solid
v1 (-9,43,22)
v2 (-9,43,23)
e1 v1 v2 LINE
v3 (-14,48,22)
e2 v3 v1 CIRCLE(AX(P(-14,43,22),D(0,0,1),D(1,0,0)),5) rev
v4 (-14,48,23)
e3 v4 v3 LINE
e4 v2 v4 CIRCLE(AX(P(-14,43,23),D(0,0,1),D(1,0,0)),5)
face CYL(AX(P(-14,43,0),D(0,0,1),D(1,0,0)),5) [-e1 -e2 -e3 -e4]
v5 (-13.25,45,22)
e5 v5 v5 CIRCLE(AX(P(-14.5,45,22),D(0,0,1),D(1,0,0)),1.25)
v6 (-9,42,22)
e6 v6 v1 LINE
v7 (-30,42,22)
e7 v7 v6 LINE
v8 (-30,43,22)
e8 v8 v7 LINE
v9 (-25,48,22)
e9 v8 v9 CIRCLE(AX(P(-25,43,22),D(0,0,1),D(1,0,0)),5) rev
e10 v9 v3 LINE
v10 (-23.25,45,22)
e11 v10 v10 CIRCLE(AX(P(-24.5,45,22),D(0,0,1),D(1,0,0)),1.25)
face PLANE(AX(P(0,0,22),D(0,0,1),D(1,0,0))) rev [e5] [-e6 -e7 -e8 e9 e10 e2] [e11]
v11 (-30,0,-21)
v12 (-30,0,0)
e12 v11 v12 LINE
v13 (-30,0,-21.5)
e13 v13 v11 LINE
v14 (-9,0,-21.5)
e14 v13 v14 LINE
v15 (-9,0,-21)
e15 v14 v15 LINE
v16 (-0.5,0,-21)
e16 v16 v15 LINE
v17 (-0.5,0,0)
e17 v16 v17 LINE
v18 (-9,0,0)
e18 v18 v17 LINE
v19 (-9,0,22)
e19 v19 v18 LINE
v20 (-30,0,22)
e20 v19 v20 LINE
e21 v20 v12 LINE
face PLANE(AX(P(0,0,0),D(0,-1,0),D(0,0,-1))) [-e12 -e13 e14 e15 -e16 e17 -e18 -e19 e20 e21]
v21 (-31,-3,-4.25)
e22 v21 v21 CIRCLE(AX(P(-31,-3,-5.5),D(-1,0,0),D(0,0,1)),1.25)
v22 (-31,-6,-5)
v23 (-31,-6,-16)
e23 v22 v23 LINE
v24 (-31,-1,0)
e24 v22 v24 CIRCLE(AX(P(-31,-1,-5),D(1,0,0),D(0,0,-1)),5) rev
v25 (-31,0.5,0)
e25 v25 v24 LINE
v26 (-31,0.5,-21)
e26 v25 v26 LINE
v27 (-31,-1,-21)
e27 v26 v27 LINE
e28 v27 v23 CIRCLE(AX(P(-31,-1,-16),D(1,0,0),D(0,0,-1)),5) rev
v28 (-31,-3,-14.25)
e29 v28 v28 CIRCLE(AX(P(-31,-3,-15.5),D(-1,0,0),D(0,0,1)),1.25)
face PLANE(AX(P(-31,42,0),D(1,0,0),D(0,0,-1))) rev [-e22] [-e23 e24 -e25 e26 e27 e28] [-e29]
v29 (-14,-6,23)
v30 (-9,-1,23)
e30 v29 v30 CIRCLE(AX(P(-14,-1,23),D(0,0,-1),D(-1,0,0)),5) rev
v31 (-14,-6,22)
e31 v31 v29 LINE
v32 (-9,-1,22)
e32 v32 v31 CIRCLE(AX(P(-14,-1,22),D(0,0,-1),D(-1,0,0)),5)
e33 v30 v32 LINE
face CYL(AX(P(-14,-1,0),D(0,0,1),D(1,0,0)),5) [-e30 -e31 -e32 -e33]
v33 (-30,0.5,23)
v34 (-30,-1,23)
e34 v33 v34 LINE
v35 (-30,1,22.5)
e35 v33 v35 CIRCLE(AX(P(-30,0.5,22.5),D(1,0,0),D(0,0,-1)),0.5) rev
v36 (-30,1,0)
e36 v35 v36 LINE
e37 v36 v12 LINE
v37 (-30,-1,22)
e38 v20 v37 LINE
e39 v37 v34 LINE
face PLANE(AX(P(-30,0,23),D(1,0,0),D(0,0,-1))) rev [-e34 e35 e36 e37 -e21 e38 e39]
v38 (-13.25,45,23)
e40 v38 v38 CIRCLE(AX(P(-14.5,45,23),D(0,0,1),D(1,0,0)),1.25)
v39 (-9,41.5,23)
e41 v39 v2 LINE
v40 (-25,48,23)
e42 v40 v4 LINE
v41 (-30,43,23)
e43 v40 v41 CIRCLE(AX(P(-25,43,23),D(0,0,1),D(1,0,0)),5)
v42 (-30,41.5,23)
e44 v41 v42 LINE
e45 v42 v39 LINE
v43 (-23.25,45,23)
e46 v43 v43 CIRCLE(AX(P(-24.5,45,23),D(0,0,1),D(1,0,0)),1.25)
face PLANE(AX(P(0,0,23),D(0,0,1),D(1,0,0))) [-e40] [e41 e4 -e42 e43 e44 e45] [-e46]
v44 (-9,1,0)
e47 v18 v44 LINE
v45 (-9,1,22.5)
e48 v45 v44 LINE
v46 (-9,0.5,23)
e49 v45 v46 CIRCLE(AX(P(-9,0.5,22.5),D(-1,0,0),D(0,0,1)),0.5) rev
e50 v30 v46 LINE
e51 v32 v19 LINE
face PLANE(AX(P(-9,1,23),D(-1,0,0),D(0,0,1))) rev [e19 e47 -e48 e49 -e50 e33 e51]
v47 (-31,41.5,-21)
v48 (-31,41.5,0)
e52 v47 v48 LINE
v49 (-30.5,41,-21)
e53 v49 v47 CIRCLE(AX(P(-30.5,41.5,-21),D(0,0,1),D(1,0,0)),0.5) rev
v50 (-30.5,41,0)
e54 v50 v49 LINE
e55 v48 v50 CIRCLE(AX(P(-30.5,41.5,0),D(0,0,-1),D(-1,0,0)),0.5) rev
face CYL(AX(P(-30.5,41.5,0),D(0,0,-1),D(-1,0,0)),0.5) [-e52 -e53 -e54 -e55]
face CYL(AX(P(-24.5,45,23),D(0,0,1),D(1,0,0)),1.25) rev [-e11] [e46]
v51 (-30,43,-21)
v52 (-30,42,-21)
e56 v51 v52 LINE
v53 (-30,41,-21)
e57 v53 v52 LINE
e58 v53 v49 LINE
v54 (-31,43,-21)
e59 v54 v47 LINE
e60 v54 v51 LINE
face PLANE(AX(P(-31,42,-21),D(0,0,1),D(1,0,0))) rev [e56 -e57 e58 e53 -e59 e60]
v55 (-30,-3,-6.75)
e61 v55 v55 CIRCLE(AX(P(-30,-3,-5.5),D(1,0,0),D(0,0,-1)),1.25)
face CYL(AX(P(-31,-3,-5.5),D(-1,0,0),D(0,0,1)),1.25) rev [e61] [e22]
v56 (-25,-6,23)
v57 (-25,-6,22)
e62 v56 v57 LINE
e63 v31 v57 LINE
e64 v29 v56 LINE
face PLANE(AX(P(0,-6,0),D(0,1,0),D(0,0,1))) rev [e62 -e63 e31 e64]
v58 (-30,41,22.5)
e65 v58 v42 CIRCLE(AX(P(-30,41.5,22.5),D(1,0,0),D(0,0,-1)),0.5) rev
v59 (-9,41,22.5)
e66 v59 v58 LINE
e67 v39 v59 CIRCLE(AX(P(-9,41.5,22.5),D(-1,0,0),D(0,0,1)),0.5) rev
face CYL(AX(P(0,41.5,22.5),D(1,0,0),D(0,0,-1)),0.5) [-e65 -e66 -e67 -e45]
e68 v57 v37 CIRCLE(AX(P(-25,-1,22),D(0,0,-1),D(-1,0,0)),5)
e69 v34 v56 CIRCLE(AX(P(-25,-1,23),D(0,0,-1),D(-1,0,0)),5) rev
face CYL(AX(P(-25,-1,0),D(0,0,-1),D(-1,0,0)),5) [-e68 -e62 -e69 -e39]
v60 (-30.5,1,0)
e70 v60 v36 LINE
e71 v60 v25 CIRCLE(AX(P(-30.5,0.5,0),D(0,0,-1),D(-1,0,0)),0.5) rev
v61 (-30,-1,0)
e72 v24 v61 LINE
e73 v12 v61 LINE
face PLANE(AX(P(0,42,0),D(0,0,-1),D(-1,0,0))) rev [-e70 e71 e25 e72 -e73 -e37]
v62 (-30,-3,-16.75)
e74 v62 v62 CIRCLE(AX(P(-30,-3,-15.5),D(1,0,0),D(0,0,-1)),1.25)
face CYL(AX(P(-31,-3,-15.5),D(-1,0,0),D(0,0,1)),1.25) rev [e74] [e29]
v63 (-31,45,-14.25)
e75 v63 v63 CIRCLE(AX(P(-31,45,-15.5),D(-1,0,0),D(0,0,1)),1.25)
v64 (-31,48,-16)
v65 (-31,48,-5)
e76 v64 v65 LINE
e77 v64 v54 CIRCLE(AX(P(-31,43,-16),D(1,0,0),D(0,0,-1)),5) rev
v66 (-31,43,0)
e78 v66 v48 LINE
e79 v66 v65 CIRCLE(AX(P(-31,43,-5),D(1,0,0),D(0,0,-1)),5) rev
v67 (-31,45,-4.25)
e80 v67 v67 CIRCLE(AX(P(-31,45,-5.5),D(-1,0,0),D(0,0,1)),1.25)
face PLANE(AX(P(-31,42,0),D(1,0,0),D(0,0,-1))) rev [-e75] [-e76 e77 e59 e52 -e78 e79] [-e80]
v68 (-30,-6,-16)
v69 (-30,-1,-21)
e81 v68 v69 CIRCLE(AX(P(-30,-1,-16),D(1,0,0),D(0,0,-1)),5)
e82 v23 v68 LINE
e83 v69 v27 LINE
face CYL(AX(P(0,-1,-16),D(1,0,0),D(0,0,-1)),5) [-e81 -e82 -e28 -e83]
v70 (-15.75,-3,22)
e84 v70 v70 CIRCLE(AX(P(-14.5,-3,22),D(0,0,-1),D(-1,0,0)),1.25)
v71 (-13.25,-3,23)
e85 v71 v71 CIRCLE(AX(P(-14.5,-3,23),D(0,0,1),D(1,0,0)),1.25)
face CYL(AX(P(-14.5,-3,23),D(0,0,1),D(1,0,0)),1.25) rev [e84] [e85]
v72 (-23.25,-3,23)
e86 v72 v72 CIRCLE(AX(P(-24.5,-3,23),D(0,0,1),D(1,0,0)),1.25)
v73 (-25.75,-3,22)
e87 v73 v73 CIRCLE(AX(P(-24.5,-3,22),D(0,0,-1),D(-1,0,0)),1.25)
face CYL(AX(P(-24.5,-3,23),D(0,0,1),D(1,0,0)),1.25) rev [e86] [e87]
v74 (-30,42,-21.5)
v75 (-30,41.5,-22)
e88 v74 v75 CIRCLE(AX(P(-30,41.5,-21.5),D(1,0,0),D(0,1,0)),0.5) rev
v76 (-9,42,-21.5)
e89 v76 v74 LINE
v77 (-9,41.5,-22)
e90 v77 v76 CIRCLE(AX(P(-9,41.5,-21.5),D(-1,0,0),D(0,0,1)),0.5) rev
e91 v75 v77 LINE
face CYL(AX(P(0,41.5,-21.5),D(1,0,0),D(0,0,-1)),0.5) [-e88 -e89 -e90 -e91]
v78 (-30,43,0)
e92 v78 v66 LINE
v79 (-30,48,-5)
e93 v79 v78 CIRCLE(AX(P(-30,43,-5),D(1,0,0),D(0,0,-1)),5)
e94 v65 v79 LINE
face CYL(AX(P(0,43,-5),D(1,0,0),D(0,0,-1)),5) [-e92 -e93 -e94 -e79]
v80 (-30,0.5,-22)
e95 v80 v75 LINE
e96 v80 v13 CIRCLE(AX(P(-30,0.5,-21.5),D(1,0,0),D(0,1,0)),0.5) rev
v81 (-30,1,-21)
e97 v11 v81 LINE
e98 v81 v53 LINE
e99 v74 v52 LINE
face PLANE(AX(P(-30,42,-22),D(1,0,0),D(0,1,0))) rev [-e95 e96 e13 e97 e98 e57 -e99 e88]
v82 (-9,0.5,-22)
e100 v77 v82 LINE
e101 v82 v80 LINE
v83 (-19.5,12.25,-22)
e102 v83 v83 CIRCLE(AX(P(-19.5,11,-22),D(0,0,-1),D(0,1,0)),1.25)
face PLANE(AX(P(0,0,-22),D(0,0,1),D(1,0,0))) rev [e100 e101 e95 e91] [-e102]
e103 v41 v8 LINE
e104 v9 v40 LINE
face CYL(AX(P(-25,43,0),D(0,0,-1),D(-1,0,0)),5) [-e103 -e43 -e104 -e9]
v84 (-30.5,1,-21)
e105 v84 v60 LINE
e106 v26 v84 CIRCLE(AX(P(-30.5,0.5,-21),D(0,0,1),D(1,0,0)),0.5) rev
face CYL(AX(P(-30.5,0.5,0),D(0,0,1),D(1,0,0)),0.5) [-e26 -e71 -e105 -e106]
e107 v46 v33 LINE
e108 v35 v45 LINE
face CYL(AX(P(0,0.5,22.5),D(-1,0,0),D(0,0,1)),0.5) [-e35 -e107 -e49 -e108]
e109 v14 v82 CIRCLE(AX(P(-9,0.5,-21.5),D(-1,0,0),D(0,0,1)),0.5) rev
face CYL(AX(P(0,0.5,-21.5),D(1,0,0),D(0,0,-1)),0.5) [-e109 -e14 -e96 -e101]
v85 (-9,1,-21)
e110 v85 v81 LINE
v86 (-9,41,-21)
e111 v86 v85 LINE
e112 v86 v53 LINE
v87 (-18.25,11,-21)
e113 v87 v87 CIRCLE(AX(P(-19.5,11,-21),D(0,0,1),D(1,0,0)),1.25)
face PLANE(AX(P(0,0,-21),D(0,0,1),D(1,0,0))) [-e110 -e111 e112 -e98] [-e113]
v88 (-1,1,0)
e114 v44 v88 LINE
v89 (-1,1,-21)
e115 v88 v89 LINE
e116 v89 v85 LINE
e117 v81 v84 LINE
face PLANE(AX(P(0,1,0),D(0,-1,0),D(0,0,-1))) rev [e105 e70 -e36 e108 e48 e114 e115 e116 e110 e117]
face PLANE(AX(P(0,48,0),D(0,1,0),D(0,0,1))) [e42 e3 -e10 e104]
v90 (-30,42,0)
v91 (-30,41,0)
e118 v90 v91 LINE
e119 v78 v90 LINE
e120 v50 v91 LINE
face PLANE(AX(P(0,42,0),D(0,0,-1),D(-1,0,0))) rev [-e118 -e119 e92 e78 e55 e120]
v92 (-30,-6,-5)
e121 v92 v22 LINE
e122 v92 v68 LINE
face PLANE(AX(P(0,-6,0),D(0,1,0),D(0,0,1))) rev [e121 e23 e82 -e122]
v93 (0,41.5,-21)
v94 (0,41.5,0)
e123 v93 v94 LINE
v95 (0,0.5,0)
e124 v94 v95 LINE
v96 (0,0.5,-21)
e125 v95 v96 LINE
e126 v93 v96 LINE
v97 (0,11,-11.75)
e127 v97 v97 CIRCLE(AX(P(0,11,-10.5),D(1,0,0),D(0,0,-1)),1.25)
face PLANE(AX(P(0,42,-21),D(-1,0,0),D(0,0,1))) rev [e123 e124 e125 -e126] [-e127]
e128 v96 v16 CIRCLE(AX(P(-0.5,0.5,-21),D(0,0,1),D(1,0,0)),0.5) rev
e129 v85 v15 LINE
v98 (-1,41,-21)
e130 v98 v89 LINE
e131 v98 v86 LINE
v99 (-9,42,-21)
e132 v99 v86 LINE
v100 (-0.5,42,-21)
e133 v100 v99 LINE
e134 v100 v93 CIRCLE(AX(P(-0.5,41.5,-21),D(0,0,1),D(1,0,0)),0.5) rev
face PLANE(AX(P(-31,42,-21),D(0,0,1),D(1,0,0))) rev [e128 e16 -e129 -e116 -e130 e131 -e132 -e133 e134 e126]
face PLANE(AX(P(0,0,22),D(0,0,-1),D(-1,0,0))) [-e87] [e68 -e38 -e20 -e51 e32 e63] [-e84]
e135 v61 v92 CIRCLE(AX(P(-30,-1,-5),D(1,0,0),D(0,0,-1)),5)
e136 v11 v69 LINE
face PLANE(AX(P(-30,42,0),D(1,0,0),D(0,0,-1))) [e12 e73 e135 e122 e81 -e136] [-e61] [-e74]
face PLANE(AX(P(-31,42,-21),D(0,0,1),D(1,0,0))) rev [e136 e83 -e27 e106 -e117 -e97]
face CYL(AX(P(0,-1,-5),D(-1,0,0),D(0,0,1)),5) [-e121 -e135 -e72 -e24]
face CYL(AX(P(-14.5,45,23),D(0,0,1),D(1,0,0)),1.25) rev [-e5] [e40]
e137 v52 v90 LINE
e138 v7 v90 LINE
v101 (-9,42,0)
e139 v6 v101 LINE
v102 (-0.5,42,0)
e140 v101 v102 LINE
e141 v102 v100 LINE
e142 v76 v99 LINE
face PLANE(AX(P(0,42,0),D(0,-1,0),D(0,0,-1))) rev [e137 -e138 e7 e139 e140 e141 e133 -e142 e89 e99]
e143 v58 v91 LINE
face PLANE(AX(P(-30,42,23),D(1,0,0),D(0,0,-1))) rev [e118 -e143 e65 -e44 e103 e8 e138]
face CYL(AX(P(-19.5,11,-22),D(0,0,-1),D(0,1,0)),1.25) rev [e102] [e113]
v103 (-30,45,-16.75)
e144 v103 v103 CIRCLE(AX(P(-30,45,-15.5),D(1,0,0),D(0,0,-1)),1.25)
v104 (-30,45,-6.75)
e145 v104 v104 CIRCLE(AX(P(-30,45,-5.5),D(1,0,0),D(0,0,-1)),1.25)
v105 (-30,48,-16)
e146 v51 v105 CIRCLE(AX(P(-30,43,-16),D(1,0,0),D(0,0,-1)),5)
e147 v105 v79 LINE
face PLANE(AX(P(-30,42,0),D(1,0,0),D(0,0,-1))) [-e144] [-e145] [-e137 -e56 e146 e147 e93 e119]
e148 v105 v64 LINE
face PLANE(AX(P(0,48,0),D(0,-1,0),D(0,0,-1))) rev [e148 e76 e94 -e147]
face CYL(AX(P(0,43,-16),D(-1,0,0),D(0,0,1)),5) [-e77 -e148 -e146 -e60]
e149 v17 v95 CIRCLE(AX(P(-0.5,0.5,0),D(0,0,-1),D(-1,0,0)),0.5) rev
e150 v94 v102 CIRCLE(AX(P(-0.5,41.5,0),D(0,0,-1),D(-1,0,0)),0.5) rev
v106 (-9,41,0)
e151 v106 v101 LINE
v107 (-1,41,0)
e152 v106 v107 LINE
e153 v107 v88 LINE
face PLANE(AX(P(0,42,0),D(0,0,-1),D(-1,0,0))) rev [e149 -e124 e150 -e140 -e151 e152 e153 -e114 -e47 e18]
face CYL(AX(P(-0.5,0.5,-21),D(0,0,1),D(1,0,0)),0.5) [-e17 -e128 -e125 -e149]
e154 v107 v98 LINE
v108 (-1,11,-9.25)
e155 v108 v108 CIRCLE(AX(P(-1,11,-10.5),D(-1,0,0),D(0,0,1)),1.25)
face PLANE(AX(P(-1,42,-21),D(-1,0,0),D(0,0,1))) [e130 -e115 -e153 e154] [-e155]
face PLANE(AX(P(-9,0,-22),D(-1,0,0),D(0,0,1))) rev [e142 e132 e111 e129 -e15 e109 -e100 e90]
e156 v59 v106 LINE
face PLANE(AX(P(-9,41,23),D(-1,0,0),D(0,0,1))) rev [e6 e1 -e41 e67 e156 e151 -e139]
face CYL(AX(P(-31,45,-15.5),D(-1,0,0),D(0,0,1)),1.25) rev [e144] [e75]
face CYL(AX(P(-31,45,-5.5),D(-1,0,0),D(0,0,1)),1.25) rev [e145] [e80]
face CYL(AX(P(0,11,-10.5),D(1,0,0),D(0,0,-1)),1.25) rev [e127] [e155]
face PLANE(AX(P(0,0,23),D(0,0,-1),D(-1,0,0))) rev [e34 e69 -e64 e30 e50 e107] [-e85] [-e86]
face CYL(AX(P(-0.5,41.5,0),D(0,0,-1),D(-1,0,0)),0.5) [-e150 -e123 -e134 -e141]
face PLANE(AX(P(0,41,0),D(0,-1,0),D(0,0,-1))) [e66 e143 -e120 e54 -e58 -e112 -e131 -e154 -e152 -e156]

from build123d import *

# Parameters (mm, degrees)
SKETCH_1_W         = 31
SKETCH_1_H         = 21
EXTRUDE_1_DEPTH    = 42
SHELL_1_T          = -1
SKETCH_2_W         = 5
SKETCH_2_H         = 21
EXTRUDE_2_DEPTH    = 6
SHELL_START        = 42
SHELL_2_OUTLINE_W  = 4
SHELL_2_OUTLINE_H  = 21
SHELL_2_DEPTH      = 6
SKETCH_3_W         = 5
SKETCH_3_H         = 21
EXTRUDE_3_DEPTH    = 6
SHELL_START_2      = -6
SHELL_3_OUTLINE_W  = 4
SHELL_3_OUTLINE_H  = 21
SHELL_3_DEPTH      = 6
SKETCH_4_W         = 21
SKETCH_4_H         = 1
EXTRUDE_4_DEPTH    = 23
SKETCH_5_W         = 21
SKETCH_5_H         = 5
EXTRUDE_5_DEPTH    = 6
SHELL_START_3      = 18
SHELL_4_OUTLINE_W  = 21
SHELL_4_OUTLINE_H  = 6
SHELL_4_DEPTH      = 4
SKETCH_6_W         = 21
SKETCH_6_H         = 5
EXTRUDE_6_DEPTH    = 6
SHELL_5_OUTLINE_W  = 21
SHELL_5_OUTLINE_H  = 6
SHELL_5_DEPTH      = 4
SKETCH_8_W         = 21
SKETCH_8_H         = 42
EXTRUDE_7_DEPTH    = 1
HOLE_WIZARD_M3_1_D = 2.5
HOLE_WIZARD_M3_2_D = 2.5
HOLE_WIZARD_M3_3_D = 2.5
HOLE_WIZARD_M3_4_D = 2.5
FILLET_2_R         = 0.5
FILLET_3_R         = 5


# Read off the part's stored shape, not the designer's step: 抽壳2, 抽壳3, 抽壳4, 抽壳5
with BuildPart() as part:
    # 草图1 → 凸台-拉伸1 (new body)
    with BuildSketch(Plane(origin=(0, 0, 0), x_dir=(1, 0, 0), z_dir=(0, 1, 0))):
        with Locations((-15.5, 10.5)):
            Rectangle(SKETCH_1_W, SKETCH_1_H)
    extrude(amount=EXTRUDE_1_DEPTH)

    # 抽壳1
    shell_1_openings = [part.faces().sort_by_distance(p)[0] for p in [
        (-15.5, 21, 0),
        (-31, 21, -10.5),
        (-15.5, 21, -21),
    ]]
    offset(amount=SHELL_1_T, openings=shell_1_openings, kind=Kind.INTERSECTION)

    # 草图2 → 凸台-拉伸2 (add)
    with BuildSketch(Plane(origin=(0, 42, 0), x_dir=(1, 0, 0), z_dir=(0, 1, 0))):
        with Locations((-28.5, 10.5)):
            Rectangle(SKETCH_2_W, SKETCH_2_H)
    extrude(amount=EXTRUDE_2_DEPTH)

    # 抽壳2 outline → 抽壳2 (cut)
    with BuildSketch(Plane(origin=(0, 0, 0), x_dir=(1, 0, 0), z_dir=(0, 1, 0)).offset(SHELL_START)):
        with Locations((-28, 10.5)):
            Rectangle(SHELL_2_OUTLINE_W, SHELL_2_OUTLINE_H)
    extrude(amount=SHELL_2_DEPTH, mode=Mode.SUBTRACT)

    # 草图3 → 凸台-拉伸3 (add)
    with BuildSketch(Plane.XZ):
        with Locations((-28.5, -10.5)):
            Rectangle(SKETCH_3_W, SKETCH_3_H)
    extrude(amount=EXTRUDE_3_DEPTH)

    # 抽壳3 outline → 抽壳3 (cut)
    with BuildSketch(Plane(origin=(0, 0, 0), x_dir=(1, 0, 0), z_dir=(0, 1, 0)).offset(SHELL_START_2)):
        with Locations((-28, 10.5)):
            Rectangle(SHELL_3_OUTLINE_W, SHELL_3_OUTLINE_H)
    extrude(amount=SHELL_3_DEPTH, mode=Mode.SUBTRACT)

    # 草图4 → 凸台-拉伸4 (add)
    with BuildSketch(Plane.XY):
        with Locations((-19.5, 41.5)):
            Rectangle(SKETCH_4_W, SKETCH_4_H)
        with Locations((-19.5, 0.5)):
            Rectangle(SKETCH_4_W, SKETCH_4_H)
    extrude(amount=EXTRUDE_4_DEPTH)

    # 草图5 → 凸台-拉伸5 (add)
    with BuildSketch(Plane(origin=(0, 42, 0), x_dir=(1, 0, 0), z_dir=(0, 1, 0))):
        with Locations((-19.5, -20.5)):
            Rectangle(SKETCH_5_W, SKETCH_5_H)
    extrude(amount=EXTRUDE_5_DEPTH)

    # 抽壳4 outline → 抽壳4 (cut)
    with BuildSketch(Plane.XY.offset(SHELL_START_3)):
        with Locations((-19.5, 45)):
            Rectangle(SHELL_4_OUTLINE_W, SHELL_4_OUTLINE_H)
    extrude(amount=SHELL_4_DEPTH, mode=Mode.SUBTRACT)

    # 草图6 → 凸台-拉伸6 (add)
    with BuildSketch(Plane.XZ):
        with Locations((-19.5, 20.5)):
            Rectangle(SKETCH_6_W, SKETCH_6_H)
    extrude(amount=EXTRUDE_6_DEPTH)

    # 抽壳5 outline → 抽壳5 (cut)
    with BuildSketch(Plane.XY.offset(SHELL_START_3)):
        with Locations((-19.5, -3)):
            Rectangle(SHELL_5_OUTLINE_W, SHELL_5_OUTLINE_H)
    extrude(amount=SHELL_5_DEPTH, mode=Mode.SUBTRACT)

    # 草图8 → 凸台-拉伸7 (add)
    with BuildSketch(Plane(origin=(0, 0, -21), x_dir=(-1, 0, 0), z_dir=(0, 0, -1))):
        with Locations((19.5, 21)):
            Rectangle(SKETCH_8_W, SKETCH_8_H)
    extrude(amount=EXTRUDE_7_DEPTH)

    # M3 螺纹孔1 (through all)
    with Locations(Plane.XY.offset(23)):
        with Locations((-24.5, 45), (-14.5, 45), (-24.5, -3), (-14.5, -3)):
            Hole(HOLE_WIZARD_M3_1_D / 2)

    # M3 螺纹孔2 (through all)
    with Locations(Plane.ZY.offset(31)):
        with Locations((-5.5, 45), (-15.5, 45), (-15.5, -3), (-5.5, -3)):
            Hole(HOLE_WIZARD_M3_2_D / 2)

    # M3 螺纹孔3 (through all)
    with Locations(Plane(origin=(0, 0, 0), x_dir=(0, 0, -1), z_dir=(1, 0, 0))):
        with Locations((10.5, 11)):
            Hole(HOLE_WIZARD_M3_3_D / 2)

    # M3 螺纹孔4 (through all)
    with Locations(Plane(origin=(0, 0, -22), x_dir=(-1, 0, 0), z_dir=(0, 0, -1))):
        with Locations((19.5, 11)):
            Hole(HOLE_WIZARD_M3_4_D / 2)

    # 圆角2
    fillet_2_edges = [part.edges().sort_by_distance(p)[0] for p in [
        (-19.5, 42, -22),
        (-19.5, 0, -22),
        (-31, 1, -10.5),
        (-31, 41, -10.5),
        (0, 42, -10.5),
        (0, 0, -10.5),
        (-19.5, 41, 23),
        (-19.5, 1, 23),
    ]]
    fillet(fillet_2_edges, radius=FILLET_2_R)

    # 圆角3
    fillet_3_edges = [part.edges().sort_by_distance(p)[0] for p in [
        (-30, 48, 22.5),
        (-9, 48, 22.5),
        (-30, -6, 22.5),
        (-9, -6, 22.5),
        (-30.5, 48, -21),
        (-30.5, 48, 0),
        (-30.5, -6, -21),
        (-30.5, -6, 0),
    ]]
    fillet(fillet_3_edges, radius=FILLET_3_R)


solid = part.part
